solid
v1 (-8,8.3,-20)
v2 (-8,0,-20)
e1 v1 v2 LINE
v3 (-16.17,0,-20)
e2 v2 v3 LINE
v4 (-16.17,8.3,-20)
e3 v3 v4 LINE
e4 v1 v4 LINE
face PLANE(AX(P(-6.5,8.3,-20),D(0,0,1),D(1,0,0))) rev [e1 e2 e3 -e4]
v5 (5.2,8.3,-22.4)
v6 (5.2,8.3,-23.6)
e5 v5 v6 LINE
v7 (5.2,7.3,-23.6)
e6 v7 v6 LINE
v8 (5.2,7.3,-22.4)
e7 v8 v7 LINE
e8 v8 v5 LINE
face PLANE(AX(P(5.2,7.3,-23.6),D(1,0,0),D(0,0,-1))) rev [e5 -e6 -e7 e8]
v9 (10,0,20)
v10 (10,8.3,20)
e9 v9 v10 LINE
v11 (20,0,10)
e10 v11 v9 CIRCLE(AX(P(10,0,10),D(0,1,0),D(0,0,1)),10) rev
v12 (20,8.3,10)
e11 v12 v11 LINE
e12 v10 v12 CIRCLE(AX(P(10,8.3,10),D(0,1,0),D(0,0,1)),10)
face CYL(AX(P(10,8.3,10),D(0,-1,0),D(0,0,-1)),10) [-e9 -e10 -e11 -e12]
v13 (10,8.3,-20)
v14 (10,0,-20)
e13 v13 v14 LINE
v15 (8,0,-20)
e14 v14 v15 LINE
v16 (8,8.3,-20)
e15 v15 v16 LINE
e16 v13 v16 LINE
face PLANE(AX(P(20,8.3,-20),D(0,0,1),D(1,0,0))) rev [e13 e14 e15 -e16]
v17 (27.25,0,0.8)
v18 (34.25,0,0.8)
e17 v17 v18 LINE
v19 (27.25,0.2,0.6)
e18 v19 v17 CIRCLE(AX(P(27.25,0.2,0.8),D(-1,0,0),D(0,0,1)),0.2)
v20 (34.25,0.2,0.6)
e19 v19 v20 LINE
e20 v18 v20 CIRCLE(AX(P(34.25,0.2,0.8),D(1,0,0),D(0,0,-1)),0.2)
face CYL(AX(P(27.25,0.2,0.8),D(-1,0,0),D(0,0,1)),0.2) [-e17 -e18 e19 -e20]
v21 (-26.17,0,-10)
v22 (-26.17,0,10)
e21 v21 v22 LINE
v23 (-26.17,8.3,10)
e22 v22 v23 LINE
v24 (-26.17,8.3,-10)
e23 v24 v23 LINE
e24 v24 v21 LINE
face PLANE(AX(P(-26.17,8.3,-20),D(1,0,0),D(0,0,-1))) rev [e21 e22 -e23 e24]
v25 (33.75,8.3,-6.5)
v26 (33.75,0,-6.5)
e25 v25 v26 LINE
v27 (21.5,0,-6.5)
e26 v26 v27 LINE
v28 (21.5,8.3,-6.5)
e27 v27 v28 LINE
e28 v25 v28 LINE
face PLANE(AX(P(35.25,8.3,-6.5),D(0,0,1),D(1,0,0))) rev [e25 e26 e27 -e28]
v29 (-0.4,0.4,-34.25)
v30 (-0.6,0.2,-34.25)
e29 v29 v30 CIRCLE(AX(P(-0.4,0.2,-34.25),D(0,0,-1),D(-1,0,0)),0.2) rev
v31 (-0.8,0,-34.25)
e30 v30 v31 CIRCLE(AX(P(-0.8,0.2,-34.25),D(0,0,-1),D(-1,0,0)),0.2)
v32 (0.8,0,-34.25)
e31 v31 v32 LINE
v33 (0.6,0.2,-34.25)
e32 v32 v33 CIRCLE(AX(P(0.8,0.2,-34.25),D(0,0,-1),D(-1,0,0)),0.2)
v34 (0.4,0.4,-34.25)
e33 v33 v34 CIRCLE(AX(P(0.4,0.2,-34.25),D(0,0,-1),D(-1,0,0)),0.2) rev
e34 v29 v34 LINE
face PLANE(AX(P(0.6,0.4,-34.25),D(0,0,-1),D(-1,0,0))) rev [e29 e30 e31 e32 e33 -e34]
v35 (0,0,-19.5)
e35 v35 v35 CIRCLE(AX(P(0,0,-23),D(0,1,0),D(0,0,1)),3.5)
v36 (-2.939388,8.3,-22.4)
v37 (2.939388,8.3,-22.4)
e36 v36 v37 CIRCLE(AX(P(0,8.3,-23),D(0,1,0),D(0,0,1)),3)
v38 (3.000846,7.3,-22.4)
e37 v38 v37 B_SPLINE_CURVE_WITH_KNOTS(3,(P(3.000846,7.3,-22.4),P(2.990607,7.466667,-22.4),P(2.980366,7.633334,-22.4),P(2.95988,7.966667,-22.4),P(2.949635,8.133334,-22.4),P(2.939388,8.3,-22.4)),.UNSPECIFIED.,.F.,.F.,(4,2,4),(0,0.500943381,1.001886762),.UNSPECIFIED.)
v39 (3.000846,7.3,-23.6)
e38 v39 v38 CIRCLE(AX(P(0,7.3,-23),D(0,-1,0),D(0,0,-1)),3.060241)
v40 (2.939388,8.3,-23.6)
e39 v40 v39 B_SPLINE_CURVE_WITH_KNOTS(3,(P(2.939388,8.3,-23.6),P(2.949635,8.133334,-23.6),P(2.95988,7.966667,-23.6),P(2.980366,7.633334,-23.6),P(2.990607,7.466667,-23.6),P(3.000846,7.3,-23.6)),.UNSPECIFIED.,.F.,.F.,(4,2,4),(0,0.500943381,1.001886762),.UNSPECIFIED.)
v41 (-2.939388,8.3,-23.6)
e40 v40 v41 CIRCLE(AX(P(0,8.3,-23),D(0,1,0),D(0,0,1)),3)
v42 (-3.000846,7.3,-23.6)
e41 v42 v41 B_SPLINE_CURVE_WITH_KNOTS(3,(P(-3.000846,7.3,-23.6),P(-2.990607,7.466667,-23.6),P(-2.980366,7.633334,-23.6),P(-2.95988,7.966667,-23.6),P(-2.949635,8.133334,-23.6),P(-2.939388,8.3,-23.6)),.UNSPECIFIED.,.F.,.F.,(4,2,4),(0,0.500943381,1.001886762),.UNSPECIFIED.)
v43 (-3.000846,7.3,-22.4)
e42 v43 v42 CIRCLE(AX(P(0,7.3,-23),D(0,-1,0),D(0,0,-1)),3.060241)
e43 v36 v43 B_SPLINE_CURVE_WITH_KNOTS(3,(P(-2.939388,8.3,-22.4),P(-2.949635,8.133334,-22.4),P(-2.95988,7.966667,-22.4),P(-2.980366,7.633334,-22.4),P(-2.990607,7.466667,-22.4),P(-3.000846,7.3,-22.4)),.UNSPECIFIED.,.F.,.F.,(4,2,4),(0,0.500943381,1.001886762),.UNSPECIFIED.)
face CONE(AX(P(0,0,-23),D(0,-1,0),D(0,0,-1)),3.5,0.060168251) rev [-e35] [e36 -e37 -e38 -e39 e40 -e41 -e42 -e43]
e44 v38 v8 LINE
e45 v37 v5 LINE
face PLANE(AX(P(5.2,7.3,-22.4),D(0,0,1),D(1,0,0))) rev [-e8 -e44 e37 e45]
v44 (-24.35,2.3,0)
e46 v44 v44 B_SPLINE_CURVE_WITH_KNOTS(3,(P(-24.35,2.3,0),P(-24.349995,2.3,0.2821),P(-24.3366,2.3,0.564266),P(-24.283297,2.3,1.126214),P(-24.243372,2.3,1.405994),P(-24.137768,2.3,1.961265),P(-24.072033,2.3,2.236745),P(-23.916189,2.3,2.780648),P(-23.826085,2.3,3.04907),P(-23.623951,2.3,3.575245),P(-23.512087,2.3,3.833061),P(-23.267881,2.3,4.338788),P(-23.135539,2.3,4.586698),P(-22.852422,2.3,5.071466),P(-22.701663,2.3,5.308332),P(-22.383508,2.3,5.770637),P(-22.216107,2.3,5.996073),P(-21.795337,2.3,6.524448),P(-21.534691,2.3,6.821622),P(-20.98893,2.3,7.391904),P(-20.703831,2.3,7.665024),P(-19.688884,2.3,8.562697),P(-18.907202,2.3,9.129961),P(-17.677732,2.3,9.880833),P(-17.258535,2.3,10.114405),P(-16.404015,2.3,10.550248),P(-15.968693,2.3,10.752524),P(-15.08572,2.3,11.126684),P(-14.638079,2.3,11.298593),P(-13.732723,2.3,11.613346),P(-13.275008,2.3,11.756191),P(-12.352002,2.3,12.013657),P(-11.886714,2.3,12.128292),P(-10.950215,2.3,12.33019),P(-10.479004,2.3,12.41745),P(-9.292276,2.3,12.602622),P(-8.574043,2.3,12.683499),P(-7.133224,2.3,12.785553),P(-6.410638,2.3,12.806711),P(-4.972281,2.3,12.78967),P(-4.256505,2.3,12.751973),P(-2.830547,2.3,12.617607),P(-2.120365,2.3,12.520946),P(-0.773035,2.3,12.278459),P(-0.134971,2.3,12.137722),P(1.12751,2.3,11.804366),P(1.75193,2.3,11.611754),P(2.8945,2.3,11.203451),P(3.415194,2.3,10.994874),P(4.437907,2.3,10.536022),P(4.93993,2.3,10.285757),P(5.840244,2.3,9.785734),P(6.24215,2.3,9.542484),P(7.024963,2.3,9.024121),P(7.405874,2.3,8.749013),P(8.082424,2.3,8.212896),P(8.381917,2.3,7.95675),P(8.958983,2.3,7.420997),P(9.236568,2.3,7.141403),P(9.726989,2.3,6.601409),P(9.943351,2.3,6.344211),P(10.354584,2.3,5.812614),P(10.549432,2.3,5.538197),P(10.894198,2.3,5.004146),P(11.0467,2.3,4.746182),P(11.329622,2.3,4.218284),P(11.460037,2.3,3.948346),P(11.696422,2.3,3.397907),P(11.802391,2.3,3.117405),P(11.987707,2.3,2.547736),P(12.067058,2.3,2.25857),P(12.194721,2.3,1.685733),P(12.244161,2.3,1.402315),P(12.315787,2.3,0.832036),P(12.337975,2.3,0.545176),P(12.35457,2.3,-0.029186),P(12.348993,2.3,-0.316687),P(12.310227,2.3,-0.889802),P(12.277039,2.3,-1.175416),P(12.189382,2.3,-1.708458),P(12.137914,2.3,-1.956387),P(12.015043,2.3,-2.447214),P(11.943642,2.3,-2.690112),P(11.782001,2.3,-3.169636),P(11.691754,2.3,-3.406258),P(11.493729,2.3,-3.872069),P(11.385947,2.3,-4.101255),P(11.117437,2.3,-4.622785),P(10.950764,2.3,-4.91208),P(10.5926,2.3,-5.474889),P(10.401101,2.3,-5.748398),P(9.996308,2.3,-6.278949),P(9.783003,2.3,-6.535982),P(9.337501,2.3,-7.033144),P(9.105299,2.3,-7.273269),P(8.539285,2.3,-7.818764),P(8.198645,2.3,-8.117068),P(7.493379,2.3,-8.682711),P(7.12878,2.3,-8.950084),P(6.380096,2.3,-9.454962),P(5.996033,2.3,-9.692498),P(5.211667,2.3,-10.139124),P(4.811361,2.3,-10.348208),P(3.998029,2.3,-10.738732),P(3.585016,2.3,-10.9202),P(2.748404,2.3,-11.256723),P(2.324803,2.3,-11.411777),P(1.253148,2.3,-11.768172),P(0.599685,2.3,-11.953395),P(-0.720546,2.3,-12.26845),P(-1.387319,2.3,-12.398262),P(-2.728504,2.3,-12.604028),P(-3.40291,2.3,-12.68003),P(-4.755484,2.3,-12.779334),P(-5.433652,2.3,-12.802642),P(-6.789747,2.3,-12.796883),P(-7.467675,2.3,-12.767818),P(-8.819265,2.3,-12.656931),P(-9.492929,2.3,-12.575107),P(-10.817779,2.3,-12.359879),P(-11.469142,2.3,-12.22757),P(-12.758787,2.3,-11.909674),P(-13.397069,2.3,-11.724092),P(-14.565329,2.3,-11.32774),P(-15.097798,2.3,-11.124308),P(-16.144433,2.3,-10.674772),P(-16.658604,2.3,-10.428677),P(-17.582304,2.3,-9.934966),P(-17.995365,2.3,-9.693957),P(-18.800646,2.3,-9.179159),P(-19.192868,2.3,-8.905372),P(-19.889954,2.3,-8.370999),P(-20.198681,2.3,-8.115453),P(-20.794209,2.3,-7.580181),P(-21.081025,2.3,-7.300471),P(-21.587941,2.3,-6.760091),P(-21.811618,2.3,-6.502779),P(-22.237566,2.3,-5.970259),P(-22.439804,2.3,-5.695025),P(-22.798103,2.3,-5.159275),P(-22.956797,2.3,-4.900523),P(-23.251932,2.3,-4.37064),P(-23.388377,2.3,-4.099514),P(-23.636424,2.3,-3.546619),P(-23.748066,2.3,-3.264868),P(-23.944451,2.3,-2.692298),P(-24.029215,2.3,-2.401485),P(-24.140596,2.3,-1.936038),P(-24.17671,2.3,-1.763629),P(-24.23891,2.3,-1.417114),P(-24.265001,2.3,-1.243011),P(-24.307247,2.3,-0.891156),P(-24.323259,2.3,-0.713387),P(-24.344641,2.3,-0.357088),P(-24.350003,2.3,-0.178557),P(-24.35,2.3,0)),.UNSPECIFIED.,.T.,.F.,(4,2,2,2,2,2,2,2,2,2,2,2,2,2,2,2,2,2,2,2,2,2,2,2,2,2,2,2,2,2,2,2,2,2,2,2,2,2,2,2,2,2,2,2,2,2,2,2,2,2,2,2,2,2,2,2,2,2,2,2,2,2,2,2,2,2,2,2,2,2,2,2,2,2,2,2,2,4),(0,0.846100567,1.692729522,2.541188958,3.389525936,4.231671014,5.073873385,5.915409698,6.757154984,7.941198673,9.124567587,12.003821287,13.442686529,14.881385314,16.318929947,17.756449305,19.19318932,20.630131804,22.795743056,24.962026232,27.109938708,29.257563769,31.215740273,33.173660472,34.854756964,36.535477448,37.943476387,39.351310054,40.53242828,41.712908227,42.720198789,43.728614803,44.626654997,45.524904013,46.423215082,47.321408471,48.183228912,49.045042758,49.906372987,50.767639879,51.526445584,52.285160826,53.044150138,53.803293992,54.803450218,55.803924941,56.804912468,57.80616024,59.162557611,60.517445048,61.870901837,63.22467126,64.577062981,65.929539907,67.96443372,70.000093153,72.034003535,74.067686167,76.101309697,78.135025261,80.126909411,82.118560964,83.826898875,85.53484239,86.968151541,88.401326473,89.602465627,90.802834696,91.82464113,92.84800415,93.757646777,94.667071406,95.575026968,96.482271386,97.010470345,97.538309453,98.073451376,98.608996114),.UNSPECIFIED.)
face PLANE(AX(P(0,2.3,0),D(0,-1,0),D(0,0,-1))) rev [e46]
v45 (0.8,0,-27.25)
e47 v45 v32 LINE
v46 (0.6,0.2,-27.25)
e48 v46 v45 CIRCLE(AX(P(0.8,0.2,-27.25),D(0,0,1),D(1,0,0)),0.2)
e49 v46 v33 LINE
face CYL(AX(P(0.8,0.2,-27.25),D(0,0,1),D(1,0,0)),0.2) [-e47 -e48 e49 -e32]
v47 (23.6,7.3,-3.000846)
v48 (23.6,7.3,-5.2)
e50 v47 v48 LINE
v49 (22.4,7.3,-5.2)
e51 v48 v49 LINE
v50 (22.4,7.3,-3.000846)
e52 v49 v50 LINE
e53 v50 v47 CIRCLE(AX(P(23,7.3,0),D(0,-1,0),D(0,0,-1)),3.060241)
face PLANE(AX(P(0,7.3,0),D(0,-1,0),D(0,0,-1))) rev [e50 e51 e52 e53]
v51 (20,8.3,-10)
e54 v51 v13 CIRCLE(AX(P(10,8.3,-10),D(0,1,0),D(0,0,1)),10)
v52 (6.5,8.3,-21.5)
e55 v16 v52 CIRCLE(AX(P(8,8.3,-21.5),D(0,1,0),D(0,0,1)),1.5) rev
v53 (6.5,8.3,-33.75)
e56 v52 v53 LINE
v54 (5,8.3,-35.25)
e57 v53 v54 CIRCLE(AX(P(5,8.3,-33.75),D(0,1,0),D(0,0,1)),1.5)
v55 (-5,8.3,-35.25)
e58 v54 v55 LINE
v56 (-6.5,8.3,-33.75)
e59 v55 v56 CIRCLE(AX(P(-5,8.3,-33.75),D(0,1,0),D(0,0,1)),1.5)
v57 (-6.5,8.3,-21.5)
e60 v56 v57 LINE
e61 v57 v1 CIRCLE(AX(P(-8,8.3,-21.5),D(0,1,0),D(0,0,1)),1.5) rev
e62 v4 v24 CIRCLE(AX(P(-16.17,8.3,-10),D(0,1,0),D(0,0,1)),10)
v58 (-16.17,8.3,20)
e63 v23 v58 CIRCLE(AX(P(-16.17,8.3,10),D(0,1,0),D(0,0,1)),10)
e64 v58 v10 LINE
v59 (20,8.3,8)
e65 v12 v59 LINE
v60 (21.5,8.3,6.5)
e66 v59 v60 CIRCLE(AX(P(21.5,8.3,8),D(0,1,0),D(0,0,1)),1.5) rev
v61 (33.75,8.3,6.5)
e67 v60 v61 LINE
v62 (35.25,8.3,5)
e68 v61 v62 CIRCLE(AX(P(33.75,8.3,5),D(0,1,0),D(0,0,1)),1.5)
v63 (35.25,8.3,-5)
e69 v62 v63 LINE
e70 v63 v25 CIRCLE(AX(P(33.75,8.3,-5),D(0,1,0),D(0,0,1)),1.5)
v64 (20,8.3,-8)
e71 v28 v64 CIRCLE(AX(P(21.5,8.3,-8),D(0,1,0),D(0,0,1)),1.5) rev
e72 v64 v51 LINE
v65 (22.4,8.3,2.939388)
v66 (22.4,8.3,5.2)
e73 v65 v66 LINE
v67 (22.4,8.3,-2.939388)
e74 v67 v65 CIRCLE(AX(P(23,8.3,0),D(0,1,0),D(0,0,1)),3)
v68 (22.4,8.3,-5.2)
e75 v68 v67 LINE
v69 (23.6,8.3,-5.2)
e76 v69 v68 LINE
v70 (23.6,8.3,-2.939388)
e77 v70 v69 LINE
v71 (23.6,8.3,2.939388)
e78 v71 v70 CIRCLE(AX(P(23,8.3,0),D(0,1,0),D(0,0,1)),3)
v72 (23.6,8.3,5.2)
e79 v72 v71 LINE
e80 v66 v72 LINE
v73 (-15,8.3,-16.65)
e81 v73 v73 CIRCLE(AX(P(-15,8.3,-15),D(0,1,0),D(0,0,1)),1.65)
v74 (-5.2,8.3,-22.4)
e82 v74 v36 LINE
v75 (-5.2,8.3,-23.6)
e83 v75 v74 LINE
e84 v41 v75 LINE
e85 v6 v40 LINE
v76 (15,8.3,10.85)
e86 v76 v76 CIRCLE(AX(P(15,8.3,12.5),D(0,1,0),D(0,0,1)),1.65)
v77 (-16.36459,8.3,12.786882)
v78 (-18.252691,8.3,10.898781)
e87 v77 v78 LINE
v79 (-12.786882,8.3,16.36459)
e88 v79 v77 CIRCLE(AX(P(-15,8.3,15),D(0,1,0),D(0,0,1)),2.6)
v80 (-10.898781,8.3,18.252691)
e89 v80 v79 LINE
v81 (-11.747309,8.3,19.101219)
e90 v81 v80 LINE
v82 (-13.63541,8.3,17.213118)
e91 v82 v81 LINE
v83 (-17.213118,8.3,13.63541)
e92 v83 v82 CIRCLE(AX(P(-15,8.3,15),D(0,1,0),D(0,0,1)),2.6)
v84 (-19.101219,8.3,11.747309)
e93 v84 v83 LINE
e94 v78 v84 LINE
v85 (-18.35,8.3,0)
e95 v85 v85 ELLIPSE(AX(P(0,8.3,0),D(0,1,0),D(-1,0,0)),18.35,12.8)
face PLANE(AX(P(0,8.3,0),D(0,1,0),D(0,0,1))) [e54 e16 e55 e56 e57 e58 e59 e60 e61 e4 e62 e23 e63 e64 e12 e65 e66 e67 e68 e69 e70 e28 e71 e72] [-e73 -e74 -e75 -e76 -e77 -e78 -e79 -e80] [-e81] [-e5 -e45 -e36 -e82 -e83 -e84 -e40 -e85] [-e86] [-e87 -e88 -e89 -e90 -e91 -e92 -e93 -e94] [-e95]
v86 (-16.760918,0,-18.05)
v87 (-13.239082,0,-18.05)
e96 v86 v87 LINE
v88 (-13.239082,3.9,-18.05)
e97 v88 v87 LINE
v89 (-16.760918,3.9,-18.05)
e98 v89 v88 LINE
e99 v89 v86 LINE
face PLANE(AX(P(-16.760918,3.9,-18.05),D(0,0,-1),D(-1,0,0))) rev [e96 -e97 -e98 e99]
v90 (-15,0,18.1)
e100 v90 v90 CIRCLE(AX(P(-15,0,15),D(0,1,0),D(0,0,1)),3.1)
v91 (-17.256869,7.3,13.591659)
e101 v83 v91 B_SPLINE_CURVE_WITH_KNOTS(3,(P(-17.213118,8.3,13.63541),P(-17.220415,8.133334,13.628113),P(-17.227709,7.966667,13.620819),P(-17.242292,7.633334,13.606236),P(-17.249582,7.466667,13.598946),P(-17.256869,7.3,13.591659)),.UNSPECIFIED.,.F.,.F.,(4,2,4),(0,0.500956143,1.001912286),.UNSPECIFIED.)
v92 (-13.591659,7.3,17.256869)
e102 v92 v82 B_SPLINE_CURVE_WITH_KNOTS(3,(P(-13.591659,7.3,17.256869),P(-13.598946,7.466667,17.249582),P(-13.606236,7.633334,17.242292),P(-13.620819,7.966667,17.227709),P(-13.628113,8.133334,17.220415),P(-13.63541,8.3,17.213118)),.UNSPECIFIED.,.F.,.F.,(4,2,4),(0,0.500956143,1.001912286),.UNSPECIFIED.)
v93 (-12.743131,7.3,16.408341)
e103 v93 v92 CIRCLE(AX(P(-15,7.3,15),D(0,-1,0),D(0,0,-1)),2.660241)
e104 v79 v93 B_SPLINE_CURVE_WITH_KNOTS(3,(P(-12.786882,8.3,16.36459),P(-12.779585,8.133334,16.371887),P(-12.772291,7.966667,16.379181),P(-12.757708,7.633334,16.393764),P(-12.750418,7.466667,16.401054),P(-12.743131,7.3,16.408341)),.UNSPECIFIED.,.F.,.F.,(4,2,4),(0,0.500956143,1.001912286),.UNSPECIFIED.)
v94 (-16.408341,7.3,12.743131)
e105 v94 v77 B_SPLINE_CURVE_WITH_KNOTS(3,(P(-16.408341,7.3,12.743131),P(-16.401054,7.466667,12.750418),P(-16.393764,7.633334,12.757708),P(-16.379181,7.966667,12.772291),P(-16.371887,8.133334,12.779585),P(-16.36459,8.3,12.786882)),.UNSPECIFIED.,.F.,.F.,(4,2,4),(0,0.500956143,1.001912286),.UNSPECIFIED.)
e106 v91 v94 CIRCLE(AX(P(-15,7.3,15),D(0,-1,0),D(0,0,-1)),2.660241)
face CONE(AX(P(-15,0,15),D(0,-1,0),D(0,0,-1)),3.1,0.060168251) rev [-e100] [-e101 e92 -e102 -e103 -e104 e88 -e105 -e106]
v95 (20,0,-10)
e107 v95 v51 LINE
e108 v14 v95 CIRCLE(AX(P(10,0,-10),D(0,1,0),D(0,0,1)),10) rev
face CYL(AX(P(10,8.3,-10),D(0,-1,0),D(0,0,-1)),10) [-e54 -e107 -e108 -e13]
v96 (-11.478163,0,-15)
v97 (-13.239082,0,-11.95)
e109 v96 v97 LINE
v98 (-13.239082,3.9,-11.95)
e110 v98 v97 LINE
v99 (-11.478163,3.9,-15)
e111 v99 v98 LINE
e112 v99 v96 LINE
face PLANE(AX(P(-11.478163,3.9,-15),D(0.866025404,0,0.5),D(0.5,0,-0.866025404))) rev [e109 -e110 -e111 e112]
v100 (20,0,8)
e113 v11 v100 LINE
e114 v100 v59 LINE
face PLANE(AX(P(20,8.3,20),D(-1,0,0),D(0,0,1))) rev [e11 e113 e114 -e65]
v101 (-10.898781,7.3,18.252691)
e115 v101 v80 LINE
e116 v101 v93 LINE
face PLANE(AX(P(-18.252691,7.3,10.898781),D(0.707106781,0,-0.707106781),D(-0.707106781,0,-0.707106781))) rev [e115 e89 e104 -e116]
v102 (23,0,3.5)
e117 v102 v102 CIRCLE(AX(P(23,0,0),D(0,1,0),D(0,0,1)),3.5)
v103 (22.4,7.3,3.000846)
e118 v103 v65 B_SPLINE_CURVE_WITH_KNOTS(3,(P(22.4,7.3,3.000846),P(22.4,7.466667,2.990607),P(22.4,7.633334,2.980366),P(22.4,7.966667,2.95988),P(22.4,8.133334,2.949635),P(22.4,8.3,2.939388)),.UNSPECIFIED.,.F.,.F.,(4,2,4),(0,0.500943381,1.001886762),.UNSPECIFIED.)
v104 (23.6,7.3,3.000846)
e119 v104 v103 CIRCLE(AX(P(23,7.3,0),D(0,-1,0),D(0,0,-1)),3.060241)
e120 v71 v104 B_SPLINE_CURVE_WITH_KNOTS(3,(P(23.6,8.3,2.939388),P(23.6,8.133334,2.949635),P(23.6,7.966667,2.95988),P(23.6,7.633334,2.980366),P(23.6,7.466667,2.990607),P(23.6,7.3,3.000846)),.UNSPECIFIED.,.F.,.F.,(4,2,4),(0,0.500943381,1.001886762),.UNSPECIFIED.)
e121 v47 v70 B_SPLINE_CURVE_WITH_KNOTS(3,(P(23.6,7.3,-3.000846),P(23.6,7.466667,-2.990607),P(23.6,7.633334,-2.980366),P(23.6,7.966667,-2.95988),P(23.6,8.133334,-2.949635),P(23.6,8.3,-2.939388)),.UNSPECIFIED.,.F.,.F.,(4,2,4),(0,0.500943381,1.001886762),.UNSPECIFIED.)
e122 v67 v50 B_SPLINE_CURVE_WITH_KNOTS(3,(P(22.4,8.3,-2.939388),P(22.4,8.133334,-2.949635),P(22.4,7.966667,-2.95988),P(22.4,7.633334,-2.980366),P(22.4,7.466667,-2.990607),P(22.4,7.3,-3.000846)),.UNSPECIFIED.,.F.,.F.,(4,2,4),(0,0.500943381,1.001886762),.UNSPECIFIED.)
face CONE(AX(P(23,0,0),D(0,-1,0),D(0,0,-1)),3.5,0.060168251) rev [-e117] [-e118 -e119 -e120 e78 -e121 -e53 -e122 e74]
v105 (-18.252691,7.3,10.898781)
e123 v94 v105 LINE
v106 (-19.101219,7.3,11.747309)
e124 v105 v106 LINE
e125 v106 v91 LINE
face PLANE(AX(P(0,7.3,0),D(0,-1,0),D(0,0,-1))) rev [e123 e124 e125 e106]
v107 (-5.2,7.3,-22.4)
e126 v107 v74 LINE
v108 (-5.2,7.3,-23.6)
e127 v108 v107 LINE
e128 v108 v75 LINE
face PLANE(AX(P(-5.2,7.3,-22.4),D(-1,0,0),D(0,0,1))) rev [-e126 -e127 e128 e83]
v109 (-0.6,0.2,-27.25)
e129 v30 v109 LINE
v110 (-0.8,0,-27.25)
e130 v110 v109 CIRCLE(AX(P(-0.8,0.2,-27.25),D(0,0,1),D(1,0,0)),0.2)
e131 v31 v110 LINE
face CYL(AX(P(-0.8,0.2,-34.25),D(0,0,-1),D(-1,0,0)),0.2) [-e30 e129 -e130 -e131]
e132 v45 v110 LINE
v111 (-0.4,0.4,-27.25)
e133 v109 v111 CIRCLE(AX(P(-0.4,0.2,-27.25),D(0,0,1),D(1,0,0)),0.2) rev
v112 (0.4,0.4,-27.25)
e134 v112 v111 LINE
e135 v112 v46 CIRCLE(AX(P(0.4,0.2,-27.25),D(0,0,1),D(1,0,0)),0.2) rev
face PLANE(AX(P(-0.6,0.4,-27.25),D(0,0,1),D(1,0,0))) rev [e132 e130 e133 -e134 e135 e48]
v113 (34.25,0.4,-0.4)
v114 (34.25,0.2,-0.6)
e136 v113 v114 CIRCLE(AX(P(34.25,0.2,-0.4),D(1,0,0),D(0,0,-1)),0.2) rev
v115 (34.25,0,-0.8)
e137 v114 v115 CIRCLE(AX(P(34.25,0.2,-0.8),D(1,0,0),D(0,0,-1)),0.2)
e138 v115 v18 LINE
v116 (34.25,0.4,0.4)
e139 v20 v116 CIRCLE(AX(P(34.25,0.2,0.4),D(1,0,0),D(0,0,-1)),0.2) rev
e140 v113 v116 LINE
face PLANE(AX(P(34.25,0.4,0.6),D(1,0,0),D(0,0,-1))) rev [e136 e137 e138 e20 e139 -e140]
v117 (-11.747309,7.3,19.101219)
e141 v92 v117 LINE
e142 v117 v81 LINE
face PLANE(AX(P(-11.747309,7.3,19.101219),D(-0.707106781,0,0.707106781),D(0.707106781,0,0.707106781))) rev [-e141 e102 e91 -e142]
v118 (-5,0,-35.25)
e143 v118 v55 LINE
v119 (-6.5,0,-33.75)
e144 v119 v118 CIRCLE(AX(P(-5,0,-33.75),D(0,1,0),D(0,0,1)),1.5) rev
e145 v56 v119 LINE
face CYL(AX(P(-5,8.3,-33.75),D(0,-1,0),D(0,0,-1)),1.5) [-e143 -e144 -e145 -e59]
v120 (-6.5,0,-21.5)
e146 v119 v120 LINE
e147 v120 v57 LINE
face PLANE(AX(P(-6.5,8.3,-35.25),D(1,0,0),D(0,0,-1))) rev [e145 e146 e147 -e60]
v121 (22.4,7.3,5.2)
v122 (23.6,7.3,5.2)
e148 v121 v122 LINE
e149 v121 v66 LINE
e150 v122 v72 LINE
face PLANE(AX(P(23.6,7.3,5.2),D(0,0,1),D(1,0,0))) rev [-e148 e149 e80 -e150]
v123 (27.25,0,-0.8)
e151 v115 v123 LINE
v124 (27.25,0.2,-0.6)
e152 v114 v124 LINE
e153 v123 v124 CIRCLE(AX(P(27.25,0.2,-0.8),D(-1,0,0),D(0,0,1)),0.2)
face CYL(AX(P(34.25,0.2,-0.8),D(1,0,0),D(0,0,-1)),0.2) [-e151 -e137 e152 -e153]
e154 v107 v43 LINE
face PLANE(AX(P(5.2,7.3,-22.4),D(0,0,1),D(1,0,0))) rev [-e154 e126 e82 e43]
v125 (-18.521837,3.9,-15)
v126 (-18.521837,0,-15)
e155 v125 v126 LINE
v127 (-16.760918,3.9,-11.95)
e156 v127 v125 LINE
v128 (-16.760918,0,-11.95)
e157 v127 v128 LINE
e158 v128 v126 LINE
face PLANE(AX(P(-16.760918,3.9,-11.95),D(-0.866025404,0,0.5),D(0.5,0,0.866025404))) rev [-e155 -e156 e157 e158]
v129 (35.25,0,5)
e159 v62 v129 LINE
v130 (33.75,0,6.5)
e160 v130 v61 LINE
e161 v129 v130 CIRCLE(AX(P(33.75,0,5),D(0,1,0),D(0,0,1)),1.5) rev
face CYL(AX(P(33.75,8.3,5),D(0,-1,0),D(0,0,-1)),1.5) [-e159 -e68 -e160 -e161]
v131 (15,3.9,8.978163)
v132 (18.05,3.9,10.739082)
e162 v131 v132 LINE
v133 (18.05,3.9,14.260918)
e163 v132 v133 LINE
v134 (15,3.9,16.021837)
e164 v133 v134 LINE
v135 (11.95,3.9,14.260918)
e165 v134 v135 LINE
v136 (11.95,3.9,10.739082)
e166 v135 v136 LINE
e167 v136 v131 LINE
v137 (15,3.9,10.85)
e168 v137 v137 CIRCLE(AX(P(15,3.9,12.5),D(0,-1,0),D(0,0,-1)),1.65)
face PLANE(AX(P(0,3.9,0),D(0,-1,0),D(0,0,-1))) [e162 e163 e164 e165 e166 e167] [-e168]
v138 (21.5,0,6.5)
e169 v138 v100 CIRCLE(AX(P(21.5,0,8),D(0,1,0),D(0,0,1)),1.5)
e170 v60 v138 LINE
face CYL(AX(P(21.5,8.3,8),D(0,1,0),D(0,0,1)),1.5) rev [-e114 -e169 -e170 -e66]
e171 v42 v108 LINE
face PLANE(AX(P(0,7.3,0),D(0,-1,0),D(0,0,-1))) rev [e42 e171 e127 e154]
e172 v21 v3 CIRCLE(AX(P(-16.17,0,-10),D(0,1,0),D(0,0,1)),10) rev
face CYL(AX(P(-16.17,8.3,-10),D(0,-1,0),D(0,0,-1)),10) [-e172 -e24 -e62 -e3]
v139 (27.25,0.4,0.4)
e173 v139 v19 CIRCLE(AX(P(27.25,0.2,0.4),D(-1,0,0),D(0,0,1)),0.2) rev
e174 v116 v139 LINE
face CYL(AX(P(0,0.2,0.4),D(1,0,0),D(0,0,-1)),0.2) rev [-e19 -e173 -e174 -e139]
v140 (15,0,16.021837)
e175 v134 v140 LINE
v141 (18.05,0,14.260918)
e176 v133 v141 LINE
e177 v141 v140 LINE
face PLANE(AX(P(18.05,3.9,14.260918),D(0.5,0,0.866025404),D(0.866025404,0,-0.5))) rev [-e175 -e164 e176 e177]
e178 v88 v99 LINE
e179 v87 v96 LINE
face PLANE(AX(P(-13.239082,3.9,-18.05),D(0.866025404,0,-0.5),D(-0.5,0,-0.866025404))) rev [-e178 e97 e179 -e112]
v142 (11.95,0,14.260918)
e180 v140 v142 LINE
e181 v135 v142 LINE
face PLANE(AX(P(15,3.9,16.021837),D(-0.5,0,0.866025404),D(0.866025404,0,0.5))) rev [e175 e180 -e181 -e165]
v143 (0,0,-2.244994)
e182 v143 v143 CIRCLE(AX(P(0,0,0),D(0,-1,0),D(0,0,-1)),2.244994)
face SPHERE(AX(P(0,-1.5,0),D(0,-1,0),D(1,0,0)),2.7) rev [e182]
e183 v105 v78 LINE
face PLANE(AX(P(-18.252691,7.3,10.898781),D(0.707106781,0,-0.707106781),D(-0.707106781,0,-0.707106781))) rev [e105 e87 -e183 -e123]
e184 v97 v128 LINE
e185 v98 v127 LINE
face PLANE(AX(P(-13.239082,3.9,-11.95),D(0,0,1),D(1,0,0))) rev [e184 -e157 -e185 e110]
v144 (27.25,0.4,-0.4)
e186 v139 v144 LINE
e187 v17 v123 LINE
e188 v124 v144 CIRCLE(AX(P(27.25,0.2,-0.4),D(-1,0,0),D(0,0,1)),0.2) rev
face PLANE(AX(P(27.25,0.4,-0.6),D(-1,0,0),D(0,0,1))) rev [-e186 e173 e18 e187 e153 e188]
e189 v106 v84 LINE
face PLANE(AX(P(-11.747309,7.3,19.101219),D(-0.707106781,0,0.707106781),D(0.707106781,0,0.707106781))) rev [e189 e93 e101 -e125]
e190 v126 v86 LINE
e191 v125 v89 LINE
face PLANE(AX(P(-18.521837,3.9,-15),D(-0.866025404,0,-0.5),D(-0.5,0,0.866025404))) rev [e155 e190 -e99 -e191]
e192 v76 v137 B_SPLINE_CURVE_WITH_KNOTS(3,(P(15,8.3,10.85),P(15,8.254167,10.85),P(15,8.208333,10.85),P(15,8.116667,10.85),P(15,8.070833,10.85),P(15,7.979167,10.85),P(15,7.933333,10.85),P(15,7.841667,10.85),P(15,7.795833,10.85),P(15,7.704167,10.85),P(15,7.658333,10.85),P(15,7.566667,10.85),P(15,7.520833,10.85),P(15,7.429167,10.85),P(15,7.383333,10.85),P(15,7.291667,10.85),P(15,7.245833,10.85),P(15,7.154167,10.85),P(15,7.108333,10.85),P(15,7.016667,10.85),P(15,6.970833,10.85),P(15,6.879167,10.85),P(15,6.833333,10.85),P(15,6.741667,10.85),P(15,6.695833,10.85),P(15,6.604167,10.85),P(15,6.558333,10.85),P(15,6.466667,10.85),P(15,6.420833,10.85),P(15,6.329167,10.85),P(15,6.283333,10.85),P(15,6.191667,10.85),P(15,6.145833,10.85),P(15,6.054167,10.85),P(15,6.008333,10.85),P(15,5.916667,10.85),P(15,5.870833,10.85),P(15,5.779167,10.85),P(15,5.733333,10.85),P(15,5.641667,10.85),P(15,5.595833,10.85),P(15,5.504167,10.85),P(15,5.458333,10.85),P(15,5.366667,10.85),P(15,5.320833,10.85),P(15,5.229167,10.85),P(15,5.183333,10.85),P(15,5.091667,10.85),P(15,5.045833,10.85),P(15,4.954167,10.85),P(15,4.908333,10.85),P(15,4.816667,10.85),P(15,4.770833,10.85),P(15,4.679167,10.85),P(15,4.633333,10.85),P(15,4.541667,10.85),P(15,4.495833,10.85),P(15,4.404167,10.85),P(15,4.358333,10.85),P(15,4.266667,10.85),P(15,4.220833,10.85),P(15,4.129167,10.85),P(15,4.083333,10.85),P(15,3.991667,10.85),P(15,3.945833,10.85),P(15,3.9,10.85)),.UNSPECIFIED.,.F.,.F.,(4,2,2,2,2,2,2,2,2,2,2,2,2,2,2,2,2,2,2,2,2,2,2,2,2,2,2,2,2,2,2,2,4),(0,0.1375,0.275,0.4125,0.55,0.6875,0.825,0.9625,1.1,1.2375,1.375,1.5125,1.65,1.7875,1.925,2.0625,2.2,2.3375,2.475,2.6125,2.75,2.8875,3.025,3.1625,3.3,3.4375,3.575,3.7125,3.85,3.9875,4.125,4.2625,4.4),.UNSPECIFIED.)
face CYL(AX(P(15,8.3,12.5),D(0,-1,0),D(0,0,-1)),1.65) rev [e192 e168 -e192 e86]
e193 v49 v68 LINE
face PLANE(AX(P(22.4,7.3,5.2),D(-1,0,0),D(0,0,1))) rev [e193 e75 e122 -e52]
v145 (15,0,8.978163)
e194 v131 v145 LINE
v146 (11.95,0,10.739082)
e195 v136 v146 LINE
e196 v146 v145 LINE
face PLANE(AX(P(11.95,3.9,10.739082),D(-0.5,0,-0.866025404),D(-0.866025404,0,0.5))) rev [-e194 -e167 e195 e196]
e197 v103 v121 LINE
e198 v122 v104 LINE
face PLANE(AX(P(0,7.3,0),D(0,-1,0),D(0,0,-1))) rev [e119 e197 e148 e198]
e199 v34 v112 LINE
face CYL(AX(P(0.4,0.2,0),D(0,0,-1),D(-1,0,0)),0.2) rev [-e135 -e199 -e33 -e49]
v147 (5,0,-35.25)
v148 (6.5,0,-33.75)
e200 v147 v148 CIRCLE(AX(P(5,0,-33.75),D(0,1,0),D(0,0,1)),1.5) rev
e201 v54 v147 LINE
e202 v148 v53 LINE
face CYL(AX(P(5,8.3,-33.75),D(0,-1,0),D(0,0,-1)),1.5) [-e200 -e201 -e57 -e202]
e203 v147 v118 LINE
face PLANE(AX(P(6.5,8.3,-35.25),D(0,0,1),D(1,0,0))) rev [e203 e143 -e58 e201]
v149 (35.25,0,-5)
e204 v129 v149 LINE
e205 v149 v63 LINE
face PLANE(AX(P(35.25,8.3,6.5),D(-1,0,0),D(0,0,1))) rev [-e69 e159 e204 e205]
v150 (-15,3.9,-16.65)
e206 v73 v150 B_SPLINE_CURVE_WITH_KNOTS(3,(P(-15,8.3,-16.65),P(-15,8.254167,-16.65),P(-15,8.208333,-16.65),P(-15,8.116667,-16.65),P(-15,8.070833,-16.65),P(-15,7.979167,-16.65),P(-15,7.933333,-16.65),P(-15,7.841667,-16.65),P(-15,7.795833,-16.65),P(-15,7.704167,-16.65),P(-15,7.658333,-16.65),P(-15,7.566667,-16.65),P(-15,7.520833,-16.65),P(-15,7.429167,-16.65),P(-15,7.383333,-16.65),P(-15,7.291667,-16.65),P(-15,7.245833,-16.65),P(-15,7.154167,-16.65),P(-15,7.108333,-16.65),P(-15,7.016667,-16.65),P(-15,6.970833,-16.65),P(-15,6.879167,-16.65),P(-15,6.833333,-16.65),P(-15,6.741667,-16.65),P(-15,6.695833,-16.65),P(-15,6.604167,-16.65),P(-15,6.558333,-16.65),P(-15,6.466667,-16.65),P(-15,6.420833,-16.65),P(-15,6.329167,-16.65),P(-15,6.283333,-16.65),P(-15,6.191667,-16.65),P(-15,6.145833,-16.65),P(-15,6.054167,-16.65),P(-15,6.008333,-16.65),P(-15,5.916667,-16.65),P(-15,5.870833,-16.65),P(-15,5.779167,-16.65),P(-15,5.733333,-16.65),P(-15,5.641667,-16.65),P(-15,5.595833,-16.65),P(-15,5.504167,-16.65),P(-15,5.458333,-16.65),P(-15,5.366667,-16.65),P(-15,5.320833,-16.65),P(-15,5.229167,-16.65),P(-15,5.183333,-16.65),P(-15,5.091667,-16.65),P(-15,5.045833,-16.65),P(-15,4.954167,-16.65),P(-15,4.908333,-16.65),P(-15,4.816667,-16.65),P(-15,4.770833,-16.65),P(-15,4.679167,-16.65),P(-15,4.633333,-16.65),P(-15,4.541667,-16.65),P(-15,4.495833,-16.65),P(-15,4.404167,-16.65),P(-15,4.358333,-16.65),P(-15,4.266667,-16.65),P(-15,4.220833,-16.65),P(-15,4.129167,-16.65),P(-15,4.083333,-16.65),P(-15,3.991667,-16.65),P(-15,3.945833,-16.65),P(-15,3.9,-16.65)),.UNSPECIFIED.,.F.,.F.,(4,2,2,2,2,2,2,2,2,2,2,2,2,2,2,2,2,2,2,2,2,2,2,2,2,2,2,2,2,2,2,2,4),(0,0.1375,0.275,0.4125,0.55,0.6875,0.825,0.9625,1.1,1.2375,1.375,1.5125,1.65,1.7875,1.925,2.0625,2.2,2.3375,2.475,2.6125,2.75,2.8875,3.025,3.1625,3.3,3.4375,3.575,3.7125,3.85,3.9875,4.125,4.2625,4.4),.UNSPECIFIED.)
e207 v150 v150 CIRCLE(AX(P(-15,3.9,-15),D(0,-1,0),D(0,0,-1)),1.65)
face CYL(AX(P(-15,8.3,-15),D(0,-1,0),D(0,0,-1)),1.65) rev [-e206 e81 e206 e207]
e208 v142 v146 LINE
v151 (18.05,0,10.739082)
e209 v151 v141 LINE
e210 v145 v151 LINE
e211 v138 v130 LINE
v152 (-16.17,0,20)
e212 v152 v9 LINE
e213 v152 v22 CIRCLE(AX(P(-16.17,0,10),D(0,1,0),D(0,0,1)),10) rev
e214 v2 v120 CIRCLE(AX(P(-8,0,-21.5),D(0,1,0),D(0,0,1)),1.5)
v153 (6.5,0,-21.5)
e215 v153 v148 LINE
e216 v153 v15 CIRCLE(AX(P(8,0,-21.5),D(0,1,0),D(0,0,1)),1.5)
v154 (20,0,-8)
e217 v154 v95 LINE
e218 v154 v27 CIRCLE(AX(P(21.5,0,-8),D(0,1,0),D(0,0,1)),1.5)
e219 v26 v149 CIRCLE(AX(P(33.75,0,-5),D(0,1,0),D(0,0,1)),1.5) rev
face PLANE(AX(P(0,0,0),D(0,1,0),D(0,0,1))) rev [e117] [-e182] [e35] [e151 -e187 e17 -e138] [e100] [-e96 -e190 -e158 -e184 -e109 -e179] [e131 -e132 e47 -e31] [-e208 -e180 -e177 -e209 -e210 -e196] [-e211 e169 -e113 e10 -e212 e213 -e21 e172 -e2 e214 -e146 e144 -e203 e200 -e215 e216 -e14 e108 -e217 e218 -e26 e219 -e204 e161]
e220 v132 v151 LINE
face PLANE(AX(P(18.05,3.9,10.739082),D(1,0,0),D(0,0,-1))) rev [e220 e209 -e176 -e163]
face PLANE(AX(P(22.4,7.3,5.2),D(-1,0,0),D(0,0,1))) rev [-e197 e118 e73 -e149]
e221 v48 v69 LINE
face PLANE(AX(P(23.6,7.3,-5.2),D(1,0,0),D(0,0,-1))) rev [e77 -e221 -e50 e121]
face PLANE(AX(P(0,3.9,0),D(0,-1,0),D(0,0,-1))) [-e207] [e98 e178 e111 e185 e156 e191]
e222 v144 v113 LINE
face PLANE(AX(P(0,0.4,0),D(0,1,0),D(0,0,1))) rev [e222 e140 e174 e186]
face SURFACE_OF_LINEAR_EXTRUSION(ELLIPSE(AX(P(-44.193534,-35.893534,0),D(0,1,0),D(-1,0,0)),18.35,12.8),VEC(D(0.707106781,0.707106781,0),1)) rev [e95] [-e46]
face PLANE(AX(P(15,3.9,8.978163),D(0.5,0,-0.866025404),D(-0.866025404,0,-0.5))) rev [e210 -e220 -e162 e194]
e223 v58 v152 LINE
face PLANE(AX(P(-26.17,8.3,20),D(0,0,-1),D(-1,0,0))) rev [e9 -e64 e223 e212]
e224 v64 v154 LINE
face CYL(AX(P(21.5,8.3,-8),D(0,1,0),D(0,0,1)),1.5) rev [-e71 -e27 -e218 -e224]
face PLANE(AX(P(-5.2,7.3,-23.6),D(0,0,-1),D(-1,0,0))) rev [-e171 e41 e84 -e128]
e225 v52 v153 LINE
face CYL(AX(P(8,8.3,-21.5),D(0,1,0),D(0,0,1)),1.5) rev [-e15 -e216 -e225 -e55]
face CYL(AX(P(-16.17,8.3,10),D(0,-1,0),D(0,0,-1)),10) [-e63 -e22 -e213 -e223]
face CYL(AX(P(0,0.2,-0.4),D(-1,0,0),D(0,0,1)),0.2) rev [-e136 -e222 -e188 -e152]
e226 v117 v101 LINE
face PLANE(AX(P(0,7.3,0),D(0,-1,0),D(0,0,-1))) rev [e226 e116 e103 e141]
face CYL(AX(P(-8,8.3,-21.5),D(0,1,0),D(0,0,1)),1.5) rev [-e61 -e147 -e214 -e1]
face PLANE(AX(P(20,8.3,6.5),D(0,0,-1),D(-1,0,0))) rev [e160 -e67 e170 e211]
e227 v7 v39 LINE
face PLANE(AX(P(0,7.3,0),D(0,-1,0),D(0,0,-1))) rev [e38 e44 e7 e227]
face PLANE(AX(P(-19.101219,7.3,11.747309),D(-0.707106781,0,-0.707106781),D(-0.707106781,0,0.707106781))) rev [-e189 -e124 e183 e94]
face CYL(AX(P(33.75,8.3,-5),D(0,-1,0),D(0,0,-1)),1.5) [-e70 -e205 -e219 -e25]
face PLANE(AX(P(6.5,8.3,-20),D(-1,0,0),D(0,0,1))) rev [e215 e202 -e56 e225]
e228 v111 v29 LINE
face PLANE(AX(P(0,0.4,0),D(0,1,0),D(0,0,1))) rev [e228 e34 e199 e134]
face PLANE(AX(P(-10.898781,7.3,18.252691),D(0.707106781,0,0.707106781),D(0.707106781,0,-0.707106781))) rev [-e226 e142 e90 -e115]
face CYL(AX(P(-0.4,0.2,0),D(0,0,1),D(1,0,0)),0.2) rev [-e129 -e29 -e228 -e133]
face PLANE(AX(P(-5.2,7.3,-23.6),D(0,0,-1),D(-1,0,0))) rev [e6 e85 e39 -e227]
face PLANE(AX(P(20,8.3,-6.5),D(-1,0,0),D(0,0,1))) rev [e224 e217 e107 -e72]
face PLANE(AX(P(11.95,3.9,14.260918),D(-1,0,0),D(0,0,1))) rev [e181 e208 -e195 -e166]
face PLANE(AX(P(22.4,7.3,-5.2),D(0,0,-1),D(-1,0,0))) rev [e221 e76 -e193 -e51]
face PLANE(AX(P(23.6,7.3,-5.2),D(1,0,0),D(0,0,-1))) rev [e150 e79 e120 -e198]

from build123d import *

# Parameters (mm, degrees)
SKETCH2_R           = 3
SKETCH2_R_2         = 2.6
SKETCH2_R_3         = 1.65
BOSS_EXTRUDE1_DEPTH = 8.3
SKETCH19_RX         = 18.35
SKETCH19_RY         = 12.8
CUT_EXTRUDE4_DEPTH  = 8.485281374
FILLET1_R           = 1.5
FILLET2_R           = 10
SKETCH14_W          = 1.2
SKETCH14_H          = 10.4
SKETCH14_W_2        = 10.4
SKETCH14_H_2        = 1.2
CUT_EXTRUDE2_DEPTH  = 1
CUT_EXTRUDE3_DEPTH  = 3.9
CHAMFER1_SIZE       = 0.5
CHAMFER1_SIZE_2     = 8.3
SKETCH20_W          = 7
SKETCH20_H          = 1.2
SKETCH20_W_2        = 1.2
SKETCH20_H_2        = 7
CUT_EXTRUDE5_DEPTH  = 0.4
FILLET3_START       = -35
FILLET3_DEPTH       = 7.75
FILLET3_START_2     = 27.25
FILLET3_2_DEPTH     = 7.75
FILLET3_START_3     = -34.25
FILLET3_3_DEPTH     = 7
FILLET3_4_DEPTH     = 7


with BuildPart() as part:
    # Sketch2 → Boss-Extrude1 (new body)
    with BuildSketch(Plane(origin=(0, 0, 0), x_dir=(1, 0, 0), z_dir=(0, 1, 0))):
        Polygon((20, -20), (20, -6.5), (35.25, -6.5), (35.25, 6.5), (20, 6.5), (20, 20), (6.5, 20), (6.5, 35.25), (-6.5, 35.25), (-6.5, 20), (-26.17, 20), (-26.17, -20), align=None)
        with Locations(Location((23, 0, 0), (0, 0, 90))):
            Circle(SKETCH2_R, mode=Mode.SUBTRACT)
        with Locations(Location((0, 23, 0), (0, 0, 90))):
            Circle(SKETCH2_R, mode=Mode.SUBTRACT)
        with Locations(Location((-15, -15, 0), (0, 0, 90))):
            Circle(SKETCH2_R_2, mode=Mode.SUBTRACT)
        with Locations(Location((-15, 15, 0), (0, 0, 90))):
            Circle(SKETCH2_R_3, mode=Mode.SUBTRACT)
        with Locations(Location((15, -12.5, 0), (0, 0, 90))):
            Circle(SKETCH2_R_3, mode=Mode.SUBTRACT)
    extrude(amount=BOSS_EXTRUDE1_DEPTH)

    # Sketch19 → Cut-Extrude4 (cut, along a direction that is not the sketch's normal)
    with BuildSketch(Plane(origin=(11.72685066, 8.3, 0), x_dir=(0, 0, -1), z_dir=(0, 1, 0))):
        with Locations(Location((0, 11.72685066), (0, 0, 90))):
            Ellipse(SKETCH19_RX, SKETCH19_RY)
    extrude(amount=-CUT_EXTRUDE4_DEPTH, dir=(0.7071067811865488, 0.7071067811865464, 0), mode=Mode.SUBTRACT)

    # Fillet1
    fillet1_edges = [part.edges().sort_by_distance(p)[0] for p in [
        (-6.5, 4.15, -20),
        (-6.5, 4.15, -35.25),
        (6.5, 4.15, -35.25),
        (6.5, 4.15, -20),
        (20, 4.15, -6.5),
        (35.25, 4.15, -6.5),
        (35.25, 4.15, 6.5),
        (20, 4.15, 6.5),
    ]]
    fillet(fillet1_edges, radius=FILLET1_R)

    # Fillet2
    fillet2_edges = [part.edges().sort_by_distance(p)[0] for p in [
        (-26.17, 4.15, 20),
        (-26.17, 4.15, -20),
        (20, 4.15, -20),
        (20, 4.15, 20),
    ]]
    fillet(fillet2_edges, radius=FILLET2_R)

    # Sketch15 → Cut-Revolve1 (revolve, cut)
    with BuildSketch(Plane.XY):
        with BuildLine():
            Line((0, 0), (0, 1.2))
            ThreePointArc((0, 1.2), (1.272792206, 0.88117618), (2.244994432, 0))
            Line((2.244994432, 0), (0, 0))
        make_face()
    revolve(axis=Axis((0, 0, 0), (0, 1, 0)), mode=Mode.SUBTRACT)

    # Sketch14 → Cut-Extrude2 (cut)
    with BuildSketch(Plane(origin=(0, 8.3, 0), x_dir=(1, 0, 0), z_dir=(0, 1, 0))):
        with Locations((23, 0)):
            Rectangle(SKETCH14_W, SKETCH14_H)
        with Locations((0, 23)):
            Rectangle(SKETCH14_W_2, SKETCH14_H_2)
        Polygon((-18.252691193, -10.898780669), (-10.898780669, -18.252691193), (-11.747308807, -19.101219331), (-19.101219331, -11.747308807), align=None)
    extrude(amount=-CUT_EXTRUDE2_DEPTH, mode=Mode.SUBTRACT)

    # Sketch16 → Cut-Extrude3 (cut)
    with BuildSketch(Plane.XZ):
        Polygon((-13.239081679, -11.95), (-16.760918321, -11.95), (-18.521836642, -15), (-16.760918321, -18.05), (-13.239081679, -18.05), (-11.478163358, -15), align=None)
        Polygon((18.05, 14.260918321), (15, 16.021836642), (11.95, 14.260918321), (11.95, 10.739081679), (15, 8.978163358), (18.05, 10.739081679), align=None)
    extrude(amount=-CUT_EXTRUDE3_DEPTH, mode=Mode.SUBTRACT)

    # Chamfer1
    # the kernel refuses this chamfer: 8.3, 0.5 mm, written as the material it takes off along each edge
    with BuildSketch(Plane(origin=(0, 0, -23), x_dir=(0, 0, -1), z_dir=(1, 0, 0))) as chamfer1_piece_1:
        Polygon((3 + CHAMFER1_SIZE, 0), (3, CHAMFER1_SIZE_2), (3, 0), align=None)
    revolve(axis=Axis((0, 0, -23), (0, 1, 0)), mode=Mode.SUBTRACT)
    with BuildSketch(Plane(origin=(23, 0, 0), x_dir=(0, 0, -1), z_dir=(1, 0, 0))) as chamfer1_piece_2:
        Polygon((3 + CHAMFER1_SIZE, 0), (3, CHAMFER1_SIZE_2), (3, 0), align=None)
    revolve(axis=Axis((23, 0, 0), (0, 1, 0)), mode=Mode.SUBTRACT)
    with BuildSketch(Plane(origin=(-15, 0, 15), x_dir=(0, 0, -1), z_dir=(1, 0, 0))) as chamfer1_piece_3:
        Polygon((2.6 + CHAMFER1_SIZE, 0), (2.6, CHAMFER1_SIZE_2), (2.6, 0), align=None)
    revolve(axis=Axis((-15, 0, 15), (0, 1, 0)), mode=Mode.SUBTRACT)

    # Sketch20 → Cut-Extrude5 (cut)
    with BuildSketch(Plane.XZ):
        with Locations((30.75, 0)):
            Rectangle(SKETCH20_W, SKETCH20_H)
        with Locations((0, -30.75)):
            Rectangle(SKETCH20_W_2, SKETCH20_H_2)
    extrude(amount=-CUT_EXTRUDE5_DEPTH, mode=Mode.SUBTRACT)

    # Fillet3: read off the stored shape, not the designer's step
    # Fillet3 outline → Fillet3 (add)
    with BuildSketch(Plane.XY.offset(FILLET3_START)):
        with BuildLine():
            ThreePointArc((-0.6, 0.2), (-0.541421356, 0.341421356), (-0.4, 0.4))
            Line((-0.4, 0.4), (-0.6, 0.4))
            Line((-0.6, 0.4), (-0.6, 0.2))
        make_face()
        with BuildLine():
            Line((0.6, 0.4), (0.4, 0.4))
            ThreePointArc((0.4, 0.4), (0.541421356, 0.341421356), (0.6, 0.2))
            Line((0.6, 0.2), (0.6, 0.4))
        make_face()
    extrude(amount=FILLET3_DEPTH)

    # Fillet3 2 outline → Fillet3 2 (add)
    with BuildSketch(Plane.YZ.offset(FILLET3_START_2)):
        with BuildLine():
            Line((0.4, -0.6), (0.4, -0.4))
            ThreePointArc((0.4, -0.4), (0.341421356, -0.541421356), (0.2, -0.6))
            Line((0.2, -0.6), (0.4, -0.6))
        make_face()
        with BuildLine():
            ThreePointArc((0.2, 0.6), (0.341421356, 0.541421356), (0.4, 0.4))
            Line((0.4, 0.4), (0.4, 0.6))
            Line((0.4, 0.6), (0.2, 0.6))
        make_face()
    extrude(amount=FILLET3_2_DEPTH)

    # Fillet3 3 outline → Fillet3 3 (cut)
    with BuildSketch(Plane.XY.offset(FILLET3_START_3)):
        with BuildLine():
            Line((-0.6, 0), (-0.6, 0.2))
            ThreePointArc((-0.6, 0.2), (-0.658578644, 0.058578644), (-0.8, 0))
            Line((-0.8, 0), (-0.6, 0))
        make_face()
        with BuildLine():
            ThreePointArc((0.8, 0), (0.658578644, 0.058578644), (0.6, 0.2))
            Line((0.6, 0.2), (0.6, 0))
            Line((0.6, 0), (0.8, 0))
        make_face()
    extrude(amount=FILLET3_3_DEPTH, mode=Mode.SUBTRACT)

    # Fillet3 4 outline → Fillet3 4 (cut)
    with BuildSketch(Plane.YZ.offset(FILLET3_START_2)):
        with BuildLine():
            ThreePointArc((0, -0.8), (0.058578644, -0.658578644), (0.2, -0.6))
            Line((0.2, -0.6), (0, -0.6))
            Line((0, -0.6), (0, -0.8))
        make_face()
        with BuildLine():
            Line((0, 0.6), (0.2, 0.6))
            ThreePointArc((0.2, 0.6), (0.058578644, 0.658578644), (0, 0.8))
            Line((0, 0.8), (0, 0.6))
        make_face()
    extrude(amount=FILLET3_4_DEPTH, mode=Mode.SUBTRACT)


solid = part.part
